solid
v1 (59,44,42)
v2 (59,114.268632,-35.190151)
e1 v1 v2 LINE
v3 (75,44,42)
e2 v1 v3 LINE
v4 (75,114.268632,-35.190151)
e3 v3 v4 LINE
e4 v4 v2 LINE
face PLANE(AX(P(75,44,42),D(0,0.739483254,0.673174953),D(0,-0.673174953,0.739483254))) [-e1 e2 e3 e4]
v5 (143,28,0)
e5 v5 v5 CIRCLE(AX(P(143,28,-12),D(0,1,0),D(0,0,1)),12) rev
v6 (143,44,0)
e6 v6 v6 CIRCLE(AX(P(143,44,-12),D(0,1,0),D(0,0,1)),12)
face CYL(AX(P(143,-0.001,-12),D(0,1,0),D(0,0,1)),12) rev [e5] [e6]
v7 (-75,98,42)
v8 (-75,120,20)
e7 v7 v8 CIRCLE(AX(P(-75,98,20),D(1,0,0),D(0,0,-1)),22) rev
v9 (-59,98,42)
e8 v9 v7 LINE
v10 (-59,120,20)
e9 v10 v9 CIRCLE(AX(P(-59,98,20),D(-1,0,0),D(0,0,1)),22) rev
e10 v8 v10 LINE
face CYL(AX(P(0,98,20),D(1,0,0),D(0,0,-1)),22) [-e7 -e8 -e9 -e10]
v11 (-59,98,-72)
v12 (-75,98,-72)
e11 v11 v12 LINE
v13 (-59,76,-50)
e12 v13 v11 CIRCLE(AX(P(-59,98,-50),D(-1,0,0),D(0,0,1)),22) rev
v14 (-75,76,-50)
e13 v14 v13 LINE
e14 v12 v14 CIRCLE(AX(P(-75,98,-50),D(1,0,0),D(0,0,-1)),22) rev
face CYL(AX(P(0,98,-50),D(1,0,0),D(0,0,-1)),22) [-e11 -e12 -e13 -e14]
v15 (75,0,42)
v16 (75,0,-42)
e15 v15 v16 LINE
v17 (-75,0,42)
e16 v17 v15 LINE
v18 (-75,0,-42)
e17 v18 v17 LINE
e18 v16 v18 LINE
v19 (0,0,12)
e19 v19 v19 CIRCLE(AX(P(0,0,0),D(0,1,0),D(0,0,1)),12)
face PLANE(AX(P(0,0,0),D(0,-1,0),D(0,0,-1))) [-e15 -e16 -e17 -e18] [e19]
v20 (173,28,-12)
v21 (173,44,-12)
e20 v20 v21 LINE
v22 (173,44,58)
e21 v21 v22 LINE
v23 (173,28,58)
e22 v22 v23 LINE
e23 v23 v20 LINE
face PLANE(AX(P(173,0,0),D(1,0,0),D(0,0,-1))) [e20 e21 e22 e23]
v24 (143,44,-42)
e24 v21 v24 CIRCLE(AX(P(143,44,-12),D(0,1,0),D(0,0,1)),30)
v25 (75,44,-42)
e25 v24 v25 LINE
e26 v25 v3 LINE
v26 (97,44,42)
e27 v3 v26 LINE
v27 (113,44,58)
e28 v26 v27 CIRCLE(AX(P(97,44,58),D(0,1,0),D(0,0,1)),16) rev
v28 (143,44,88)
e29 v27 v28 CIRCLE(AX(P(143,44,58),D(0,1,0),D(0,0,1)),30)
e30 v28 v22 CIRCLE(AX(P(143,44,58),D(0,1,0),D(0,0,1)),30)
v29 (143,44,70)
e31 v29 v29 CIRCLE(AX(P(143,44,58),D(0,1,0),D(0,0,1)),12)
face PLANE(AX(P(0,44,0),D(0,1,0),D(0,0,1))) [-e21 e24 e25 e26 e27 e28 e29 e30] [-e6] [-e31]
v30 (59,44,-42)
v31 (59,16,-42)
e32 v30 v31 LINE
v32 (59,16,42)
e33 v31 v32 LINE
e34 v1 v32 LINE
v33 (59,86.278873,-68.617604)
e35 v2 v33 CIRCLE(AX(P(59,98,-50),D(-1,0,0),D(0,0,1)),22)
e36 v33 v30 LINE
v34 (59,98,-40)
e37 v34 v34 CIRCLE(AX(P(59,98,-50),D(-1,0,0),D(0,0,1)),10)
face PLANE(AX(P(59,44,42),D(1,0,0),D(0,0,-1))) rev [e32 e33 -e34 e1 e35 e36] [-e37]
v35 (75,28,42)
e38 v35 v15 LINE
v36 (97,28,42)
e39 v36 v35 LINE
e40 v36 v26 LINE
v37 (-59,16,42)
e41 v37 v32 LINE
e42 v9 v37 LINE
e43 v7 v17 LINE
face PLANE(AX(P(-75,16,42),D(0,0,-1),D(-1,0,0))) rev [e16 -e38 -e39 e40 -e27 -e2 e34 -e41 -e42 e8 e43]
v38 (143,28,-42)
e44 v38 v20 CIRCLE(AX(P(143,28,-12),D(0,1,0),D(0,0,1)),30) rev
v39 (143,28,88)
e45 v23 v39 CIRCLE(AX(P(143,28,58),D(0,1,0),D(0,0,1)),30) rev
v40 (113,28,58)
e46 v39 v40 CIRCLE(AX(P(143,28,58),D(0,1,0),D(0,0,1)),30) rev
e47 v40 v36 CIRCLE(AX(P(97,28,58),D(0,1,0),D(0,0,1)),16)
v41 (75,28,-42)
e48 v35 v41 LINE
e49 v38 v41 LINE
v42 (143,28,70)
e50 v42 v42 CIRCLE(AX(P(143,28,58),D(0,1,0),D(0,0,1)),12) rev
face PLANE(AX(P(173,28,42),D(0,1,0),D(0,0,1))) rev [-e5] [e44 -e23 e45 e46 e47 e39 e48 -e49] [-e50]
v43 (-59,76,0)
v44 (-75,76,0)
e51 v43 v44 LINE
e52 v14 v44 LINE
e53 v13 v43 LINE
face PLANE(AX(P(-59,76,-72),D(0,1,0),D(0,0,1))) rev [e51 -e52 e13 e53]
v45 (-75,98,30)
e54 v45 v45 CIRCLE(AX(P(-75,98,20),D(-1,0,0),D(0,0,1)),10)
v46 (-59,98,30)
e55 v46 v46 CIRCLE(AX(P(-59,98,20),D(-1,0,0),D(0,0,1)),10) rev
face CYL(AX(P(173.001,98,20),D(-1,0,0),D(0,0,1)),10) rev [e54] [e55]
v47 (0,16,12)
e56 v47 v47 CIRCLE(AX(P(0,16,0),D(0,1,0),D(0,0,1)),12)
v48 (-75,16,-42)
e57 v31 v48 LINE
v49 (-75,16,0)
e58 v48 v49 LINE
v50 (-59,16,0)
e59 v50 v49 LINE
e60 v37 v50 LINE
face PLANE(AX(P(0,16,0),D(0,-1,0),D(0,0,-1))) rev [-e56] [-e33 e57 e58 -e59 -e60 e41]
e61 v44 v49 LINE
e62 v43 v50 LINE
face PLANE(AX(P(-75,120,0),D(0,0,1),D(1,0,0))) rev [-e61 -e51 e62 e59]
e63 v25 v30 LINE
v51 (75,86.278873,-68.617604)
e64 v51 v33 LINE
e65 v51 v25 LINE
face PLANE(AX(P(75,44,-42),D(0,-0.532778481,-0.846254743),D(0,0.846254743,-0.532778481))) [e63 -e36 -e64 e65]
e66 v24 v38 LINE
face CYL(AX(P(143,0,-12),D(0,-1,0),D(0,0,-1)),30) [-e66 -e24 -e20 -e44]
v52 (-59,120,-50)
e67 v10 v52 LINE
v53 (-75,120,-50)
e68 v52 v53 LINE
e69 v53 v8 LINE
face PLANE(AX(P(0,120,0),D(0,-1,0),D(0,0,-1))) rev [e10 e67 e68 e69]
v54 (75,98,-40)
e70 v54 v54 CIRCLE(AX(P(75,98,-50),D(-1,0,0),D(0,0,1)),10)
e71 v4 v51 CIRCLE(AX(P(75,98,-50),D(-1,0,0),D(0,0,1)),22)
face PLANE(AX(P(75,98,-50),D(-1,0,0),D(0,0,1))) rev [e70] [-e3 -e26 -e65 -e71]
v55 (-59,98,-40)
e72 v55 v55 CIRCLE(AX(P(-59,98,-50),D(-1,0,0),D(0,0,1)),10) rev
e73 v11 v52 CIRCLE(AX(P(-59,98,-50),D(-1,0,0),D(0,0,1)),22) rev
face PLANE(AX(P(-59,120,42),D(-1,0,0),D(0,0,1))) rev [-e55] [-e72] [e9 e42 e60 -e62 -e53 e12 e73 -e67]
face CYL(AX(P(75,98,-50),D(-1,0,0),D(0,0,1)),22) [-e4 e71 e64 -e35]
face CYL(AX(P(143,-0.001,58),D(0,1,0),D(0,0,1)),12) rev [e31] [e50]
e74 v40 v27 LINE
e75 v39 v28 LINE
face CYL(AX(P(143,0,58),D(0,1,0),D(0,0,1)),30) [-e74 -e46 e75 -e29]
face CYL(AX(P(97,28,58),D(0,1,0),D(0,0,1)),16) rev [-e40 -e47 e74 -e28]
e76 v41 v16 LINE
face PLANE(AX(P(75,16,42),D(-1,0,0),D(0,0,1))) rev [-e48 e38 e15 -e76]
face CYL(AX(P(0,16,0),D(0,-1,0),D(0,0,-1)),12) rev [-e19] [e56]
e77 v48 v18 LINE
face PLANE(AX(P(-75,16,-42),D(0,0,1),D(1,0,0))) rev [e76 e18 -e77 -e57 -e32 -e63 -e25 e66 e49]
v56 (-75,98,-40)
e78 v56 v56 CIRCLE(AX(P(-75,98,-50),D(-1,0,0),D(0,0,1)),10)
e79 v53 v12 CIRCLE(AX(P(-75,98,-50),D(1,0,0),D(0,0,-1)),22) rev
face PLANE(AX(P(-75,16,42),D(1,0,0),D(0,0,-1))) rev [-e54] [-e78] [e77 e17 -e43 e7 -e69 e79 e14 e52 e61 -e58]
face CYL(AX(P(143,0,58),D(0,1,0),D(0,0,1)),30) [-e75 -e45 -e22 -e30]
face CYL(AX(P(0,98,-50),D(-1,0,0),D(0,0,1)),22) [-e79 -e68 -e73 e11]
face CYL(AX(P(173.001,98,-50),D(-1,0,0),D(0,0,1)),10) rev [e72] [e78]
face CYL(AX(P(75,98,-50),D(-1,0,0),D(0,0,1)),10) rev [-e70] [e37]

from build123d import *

# Parameters (mm, degrees)
SKETCH1_W           = 150
SKETCH1_H           = 84
SKETCH1_R           = 12
BOSS_EXTRUDE1_DEPTH = 16
SKETCH4_W           = 16
SKETCH4_H           = 84
BOSS_EXTRUDE2_DEPTH = 28
SKETCH5_W           = 84
SKETCH5_H           = 16
BOSS_EXTRUDE3_DEPTH = 98
SKETCH7_W           = 60
SKETCH7_H           = 16
BOSS_EXTRUDE4_DEPTH = 46
FILLET2_R           = 30
FILLET3_R           = 16
CUT_EXTRUDE1_REACH  = 201.02
SKETCH9_R           = 12
SKETCH11_R          = 10
BOSS_EXTRUDE5_DEPTH = 16
SKETCH13_W          = 16
SKETCH13_H          = 42
BOSS_EXTRUDE6_DEPTH = 104
FILLET4_R           = 22
CUT_EXTRUDE2_REACH  = 291.22
SKETCH15_R          = 10
SKETCH14_W          = 16
SKETCH14_H          = 44
BOSS_EXTRUDE8_DEPTH = 72
CUT_EXTRUDE3_REACH  = 291.22
SKETCH16_R          = 10
FILLET5_R           = 22


with BuildPart() as part:
    # Sketch1 → Boss-Extrude1 (new body)
    with BuildSketch(Plane(origin=(0, 0, 0), x_dir=(1, 0, 0), z_dir=(0, 1, 0))):
        Rectangle(SKETCH1_W, SKETCH1_H)
        with Locations(Location((0, 0, 0), (0, 0, 270))):
            Circle(SKETCH1_R, mode=Mode.SUBTRACT)
    extrude(amount=BOSS_EXTRUDE1_DEPTH)

    # Sketch4 → Boss-Extrude2 (add)
    with BuildSketch(Plane(origin=(0, 16, 0), x_dir=(1, 0, 0), z_dir=(0, 1, 0))):
        with Locations((67, 0)):
            Rectangle(SKETCH4_W, SKETCH4_H)
    extrude(amount=BOSS_EXTRUDE2_DEPTH)

    # Sketch5 → Boss-Extrude3 (add)
    with BuildSketch(Plane(origin=(75, 0, 0), x_dir=(0, 0, -1), z_dir=(1, 0, 0))):
        with Locations((0, 36)):
            Rectangle(SKETCH5_W, SKETCH5_H)
    extrude(amount=BOSS_EXTRUDE3_DEPTH)

    # Sketch7 → Boss-Extrude4 (add)
    with BuildSketch(Plane.XY.offset(42)):
        with Locations((143, 36)):
            Rectangle(SKETCH7_W, SKETCH7_H)
    extrude(amount=BOSS_EXTRUDE4_DEPTH)

    # Fillet2
    fillet2_edges = [part.edges().sort_by_distance(p)[0] for p in [
        (173, 36, 88),
        (173, 36, -42),
        (113, 36, 88),
    ]]
    fillet(fillet2_edges, radius=FILLET2_R - 0.0001)  # a hair under: the kernel refuses the full size

    # Fillet3
    fillet3_edges = [part.edges().sort_by_distance(p)[0] for p in [
        (113, 36, 42),
    ]]
    fillet(fillet3_edges, radius=FILLET3_R)

    # Sketch9 → Cut-Extrude1 (cut, up to next)
    with BuildSketch(Plane(origin=(0, 44, 0), x_dir=(1, 0, 0), z_dir=(0, 1, 0)), mode=Mode.PRIVATE) as cut_extrude1_sk1:
        with Locations(Location((143, 12, 0), (0, 0, 270))):
            Circle(SKETCH9_R)
    cut_extrude1_tool1 = extrude(cut_extrude1_sk1.sketch, amount=-CUT_EXTRUDE1_REACH, mode=Mode.PRIVATE) & part.part
    # Sketch9 → Cut-Extrude1 (cut, up to next)
    with BuildSketch(Plane(origin=(0, 44, 0), x_dir=(1, 0, 0), z_dir=(0, 1, 0)), mode=Mode.PRIVATE) as cut_extrude1_sk2:
        with Locations(Location((143, -58, 0), (0, 0, 270))):
            Circle(SKETCH9_R)
    cut_extrude1_tool2 = extrude(cut_extrude1_sk2.sketch, amount=-CUT_EXTRUDE1_REACH, mode=Mode.PRIVATE) & part.part
    add(cut_extrude1_tool1.solids().sort_by_distance((143, 44, -12))[0], mode=Mode.SUBTRACT)
    add(cut_extrude1_tool2.solids().sort_by_distance((143, 44, 58))[0], mode=Mode.SUBTRACT)

    # Sketch11 → Boss-Extrude5 (add)
    with BuildSketch(Plane.ZY.offset(-59)):
        with BuildLine():
            Line((-42, 44), (-68.617604355, 86.278873429))
            ThreePointArc((-68.617604355, 86.278873429), (-64.123788111, 114.867679431), (-35.190151029, 114.268631579))
            Line((-35.190151029, 114.268631579), (42, 44))
            Line((42, 44), (-42, 44))
        make_face()
        with Locations((-50, 98)):
            Circle(SKETCH11_R, mode=Mode.SUBTRACT)
    extrude(amount=-BOSS_EXTRUDE5_DEPTH)

    # Sketch13 → Boss-Extrude6 (add)
    with BuildSketch(Plane(origin=(0, 16, 0), x_dir=(1, 0, 0), z_dir=(0, 1, 0))):
        with Locations((-67, -21)):
            Rectangle(SKETCH13_W, SKETCH13_H)
    extrude(amount=BOSS_EXTRUDE6_DEPTH)

    # Fillet4
    fillet4_edges = [part.edges().sort_by_distance(p)[0] for p in [
        (-67, 120, 42),
    ]]
    fillet(fillet4_edges, radius=FILLET4_R)

    # Sketch15 → Cut-Extrude2 (cut, up to next)
    with BuildSketch(Plane.ZY.offset(75), mode=Mode.PRIVATE) as cut_extrude2_sk1:
        with Locations((20, 98)):
            Circle(SKETCH15_R)
    cut_extrude2_tool1 = extrude(cut_extrude2_sk1.sketch, amount=-CUT_EXTRUDE2_REACH, mode=Mode.PRIVATE) & part.part
    add(cut_extrude2_tool1.solids().sort_by_distance((-75, 98, 20))[0], mode=Mode.SUBTRACT)

    # Sketch14 → Boss-Extrude8 (add)
    with BuildSketch(Plane(origin=(0, 0, 0), x_dir=(-1, 0, 0), z_dir=(0, 0, -1))):
        with Locations((67, 98)):
            Rectangle(SKETCH14_W, SKETCH14_H)
    extrude(amount=BOSS_EXTRUDE8_DEPTH)

    # Sketch16 → Cut-Extrude3 (cut, up to next)
    with BuildSketch(Plane.ZY.offset(75), mode=Mode.PRIVATE) as cut_extrude3_sk1:
        with Locations((-50, 98)):
            Circle(SKETCH16_R)
    cut_extrude3_tool1 = extrude(cut_extrude3_sk1.sketch, amount=-CUT_EXTRUDE3_REACH, mode=Mode.PRIVATE) & part.part
    add(cut_extrude3_tool1.solids().sort_by_distance((-75, 98, -50))[0], mode=Mode.SUBTRACT)

    # Fillet5
    fillet5_edges = [part.edges().sort_by_distance(p)[0] for p in [
        (-67, 120, -72),
        (-67, 76, -72),
    ]]
    fillet(fillet5_edges, radius=FILLET5_R - 0.0001)  # a hair under: the kernel refuses the full size


solid = part.part
